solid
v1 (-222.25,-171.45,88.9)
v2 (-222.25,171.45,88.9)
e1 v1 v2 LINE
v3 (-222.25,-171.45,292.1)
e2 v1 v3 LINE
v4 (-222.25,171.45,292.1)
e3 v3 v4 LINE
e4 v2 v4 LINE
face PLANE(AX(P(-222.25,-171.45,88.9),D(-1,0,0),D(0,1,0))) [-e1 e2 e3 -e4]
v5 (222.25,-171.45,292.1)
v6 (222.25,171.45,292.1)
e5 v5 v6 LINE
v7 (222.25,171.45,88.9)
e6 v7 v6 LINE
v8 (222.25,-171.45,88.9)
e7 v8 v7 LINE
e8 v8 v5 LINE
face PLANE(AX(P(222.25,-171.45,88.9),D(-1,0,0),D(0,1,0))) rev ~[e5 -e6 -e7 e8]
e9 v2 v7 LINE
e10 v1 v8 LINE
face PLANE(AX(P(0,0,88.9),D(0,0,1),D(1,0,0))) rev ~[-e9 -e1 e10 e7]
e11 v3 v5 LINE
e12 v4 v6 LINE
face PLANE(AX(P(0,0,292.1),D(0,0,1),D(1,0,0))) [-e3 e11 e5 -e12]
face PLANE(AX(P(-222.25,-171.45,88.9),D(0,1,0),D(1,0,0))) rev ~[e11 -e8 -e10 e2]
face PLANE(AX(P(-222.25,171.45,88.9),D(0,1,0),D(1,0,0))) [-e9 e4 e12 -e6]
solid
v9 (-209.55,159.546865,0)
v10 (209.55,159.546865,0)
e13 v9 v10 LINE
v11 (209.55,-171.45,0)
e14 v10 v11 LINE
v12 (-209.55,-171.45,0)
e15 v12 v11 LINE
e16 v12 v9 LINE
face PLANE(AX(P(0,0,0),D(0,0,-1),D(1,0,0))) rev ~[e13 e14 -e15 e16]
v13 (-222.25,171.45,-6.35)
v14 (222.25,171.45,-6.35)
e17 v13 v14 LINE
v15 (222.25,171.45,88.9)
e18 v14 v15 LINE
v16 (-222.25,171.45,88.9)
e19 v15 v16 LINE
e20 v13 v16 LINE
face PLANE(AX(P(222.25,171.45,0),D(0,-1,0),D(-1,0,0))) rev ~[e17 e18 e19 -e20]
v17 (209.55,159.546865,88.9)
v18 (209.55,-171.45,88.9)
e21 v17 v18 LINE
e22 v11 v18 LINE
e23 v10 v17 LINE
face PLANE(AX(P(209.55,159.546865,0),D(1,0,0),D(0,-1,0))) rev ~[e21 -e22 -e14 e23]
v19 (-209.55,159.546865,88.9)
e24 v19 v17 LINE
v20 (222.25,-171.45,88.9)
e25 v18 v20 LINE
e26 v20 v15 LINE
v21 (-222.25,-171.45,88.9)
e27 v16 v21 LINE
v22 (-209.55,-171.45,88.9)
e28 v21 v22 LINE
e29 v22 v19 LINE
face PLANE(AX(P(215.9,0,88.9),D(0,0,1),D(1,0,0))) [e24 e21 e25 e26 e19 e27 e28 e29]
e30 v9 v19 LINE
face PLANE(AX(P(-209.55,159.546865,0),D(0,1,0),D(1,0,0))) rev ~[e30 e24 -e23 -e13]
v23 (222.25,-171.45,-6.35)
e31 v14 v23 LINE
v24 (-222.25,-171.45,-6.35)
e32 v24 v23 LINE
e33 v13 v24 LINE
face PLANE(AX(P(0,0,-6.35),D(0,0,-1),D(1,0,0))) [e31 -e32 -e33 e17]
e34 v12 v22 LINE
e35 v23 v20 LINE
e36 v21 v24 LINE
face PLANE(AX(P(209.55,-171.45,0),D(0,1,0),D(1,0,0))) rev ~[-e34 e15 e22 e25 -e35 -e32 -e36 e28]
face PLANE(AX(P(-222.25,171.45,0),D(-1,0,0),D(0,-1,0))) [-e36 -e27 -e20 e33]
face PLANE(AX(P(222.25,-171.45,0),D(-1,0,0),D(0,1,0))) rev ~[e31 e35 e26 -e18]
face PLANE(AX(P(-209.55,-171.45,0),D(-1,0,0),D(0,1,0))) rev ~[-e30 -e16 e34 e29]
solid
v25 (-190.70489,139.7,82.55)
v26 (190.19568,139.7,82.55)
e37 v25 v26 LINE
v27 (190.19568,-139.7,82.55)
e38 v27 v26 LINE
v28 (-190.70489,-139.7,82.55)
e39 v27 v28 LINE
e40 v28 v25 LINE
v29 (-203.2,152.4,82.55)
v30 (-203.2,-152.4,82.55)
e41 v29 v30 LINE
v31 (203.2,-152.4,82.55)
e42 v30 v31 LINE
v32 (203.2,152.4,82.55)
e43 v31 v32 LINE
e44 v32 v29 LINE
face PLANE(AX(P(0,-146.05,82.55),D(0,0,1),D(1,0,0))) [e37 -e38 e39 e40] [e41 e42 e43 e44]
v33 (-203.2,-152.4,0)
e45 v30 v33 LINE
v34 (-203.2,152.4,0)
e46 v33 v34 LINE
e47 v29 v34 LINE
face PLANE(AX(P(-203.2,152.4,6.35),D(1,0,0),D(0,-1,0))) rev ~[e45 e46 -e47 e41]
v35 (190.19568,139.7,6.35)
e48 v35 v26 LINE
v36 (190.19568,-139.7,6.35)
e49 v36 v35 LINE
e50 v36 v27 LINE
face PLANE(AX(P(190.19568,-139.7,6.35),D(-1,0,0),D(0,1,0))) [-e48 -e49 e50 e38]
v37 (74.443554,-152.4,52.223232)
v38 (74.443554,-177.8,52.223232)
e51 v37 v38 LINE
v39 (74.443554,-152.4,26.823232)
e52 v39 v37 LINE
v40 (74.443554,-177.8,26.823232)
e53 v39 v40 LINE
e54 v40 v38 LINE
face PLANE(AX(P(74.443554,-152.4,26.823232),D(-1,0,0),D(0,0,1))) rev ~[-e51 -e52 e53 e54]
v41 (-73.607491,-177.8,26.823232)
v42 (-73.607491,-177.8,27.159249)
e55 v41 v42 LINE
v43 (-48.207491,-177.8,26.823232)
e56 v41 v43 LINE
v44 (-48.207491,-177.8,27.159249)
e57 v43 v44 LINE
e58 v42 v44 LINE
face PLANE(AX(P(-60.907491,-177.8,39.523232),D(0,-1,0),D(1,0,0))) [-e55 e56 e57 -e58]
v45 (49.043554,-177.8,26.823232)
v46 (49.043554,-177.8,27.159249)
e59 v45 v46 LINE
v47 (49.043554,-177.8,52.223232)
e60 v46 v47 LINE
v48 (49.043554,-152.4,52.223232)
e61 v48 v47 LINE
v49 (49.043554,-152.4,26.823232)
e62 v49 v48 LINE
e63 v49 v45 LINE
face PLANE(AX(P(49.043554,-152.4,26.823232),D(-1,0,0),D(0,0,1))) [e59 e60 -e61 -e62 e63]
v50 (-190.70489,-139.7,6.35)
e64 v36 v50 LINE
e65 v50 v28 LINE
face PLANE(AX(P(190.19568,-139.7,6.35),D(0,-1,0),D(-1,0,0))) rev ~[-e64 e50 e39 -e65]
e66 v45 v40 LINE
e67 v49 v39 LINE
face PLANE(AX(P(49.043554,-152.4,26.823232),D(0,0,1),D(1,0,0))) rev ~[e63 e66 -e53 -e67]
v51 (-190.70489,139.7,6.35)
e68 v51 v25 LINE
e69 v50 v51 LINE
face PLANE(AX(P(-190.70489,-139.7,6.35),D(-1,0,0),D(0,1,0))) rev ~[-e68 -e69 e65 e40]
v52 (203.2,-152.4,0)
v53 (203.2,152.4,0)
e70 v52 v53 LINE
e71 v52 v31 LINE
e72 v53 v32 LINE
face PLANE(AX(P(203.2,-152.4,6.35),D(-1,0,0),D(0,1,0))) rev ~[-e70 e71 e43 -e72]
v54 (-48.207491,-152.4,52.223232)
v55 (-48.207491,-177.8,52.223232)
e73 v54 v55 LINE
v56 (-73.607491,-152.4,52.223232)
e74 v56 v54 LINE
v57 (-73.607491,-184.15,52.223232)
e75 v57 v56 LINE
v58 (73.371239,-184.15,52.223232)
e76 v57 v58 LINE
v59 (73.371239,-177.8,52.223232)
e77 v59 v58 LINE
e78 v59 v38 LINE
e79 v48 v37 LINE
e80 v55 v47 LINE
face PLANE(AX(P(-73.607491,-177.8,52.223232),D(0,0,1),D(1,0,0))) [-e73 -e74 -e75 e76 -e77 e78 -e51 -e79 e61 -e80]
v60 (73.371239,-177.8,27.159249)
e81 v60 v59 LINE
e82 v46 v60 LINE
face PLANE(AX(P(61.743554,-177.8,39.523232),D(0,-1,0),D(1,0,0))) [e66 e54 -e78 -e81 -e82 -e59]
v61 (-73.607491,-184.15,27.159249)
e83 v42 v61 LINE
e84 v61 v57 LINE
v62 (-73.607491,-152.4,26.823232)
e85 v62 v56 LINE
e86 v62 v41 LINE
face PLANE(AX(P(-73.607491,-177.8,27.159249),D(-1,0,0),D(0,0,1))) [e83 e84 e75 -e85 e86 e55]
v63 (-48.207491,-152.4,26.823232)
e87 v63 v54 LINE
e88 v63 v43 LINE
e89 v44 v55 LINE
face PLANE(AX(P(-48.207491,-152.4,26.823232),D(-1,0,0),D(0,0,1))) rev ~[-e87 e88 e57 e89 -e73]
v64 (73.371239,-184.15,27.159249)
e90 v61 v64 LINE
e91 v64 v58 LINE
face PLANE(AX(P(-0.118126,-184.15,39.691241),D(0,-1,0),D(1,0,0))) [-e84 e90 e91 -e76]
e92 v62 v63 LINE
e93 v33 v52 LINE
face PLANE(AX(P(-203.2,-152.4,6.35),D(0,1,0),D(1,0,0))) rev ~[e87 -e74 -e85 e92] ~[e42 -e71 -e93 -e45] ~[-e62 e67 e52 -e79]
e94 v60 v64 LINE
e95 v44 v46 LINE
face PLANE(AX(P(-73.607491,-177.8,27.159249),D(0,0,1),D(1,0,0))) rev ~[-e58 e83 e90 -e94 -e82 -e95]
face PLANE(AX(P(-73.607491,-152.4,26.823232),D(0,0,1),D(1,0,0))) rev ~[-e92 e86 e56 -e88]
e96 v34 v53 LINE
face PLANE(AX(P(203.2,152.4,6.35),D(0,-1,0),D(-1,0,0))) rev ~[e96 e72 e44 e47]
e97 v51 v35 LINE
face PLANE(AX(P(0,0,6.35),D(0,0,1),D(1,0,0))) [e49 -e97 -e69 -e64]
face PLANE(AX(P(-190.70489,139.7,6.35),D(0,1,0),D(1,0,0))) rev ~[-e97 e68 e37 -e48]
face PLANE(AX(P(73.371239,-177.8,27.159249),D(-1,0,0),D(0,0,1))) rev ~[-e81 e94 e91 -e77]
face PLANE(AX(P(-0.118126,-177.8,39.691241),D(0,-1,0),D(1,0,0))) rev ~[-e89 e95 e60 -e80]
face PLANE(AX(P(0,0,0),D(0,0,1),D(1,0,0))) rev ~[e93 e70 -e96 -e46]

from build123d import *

# Parameters (mm, degrees)
F0_W      = 406.4
F0_H      = 304.8
F1_DEPTH  = 6.35
F2_W      = 12.4951104045
F2_H      = 279.4
F2_W_2    = 13.0043203354
F3_DEPTH  = 76.2
F4_W      = 444.5
F4_H      = 342.9
F5_DEPTH  = 6.35
F6_W      = 419.1
F6_H      = 11.9031353712
F7_DEPTH  = 88.9
F8_W      = 444.5
F8_H      = 342.9
F9_DEPTH  = 203.2
F10_W     = 25.4
F10_H     = 25.4
F11_DEPTH = 25.4
F12_W     = 146.9787295926
F12_H     = 25.0639826562
F13_DEPTH = 6.35


# Not quite as in the source:
# - a length typed as a fraction of an inch, garbled in the dataset ("3 / 203.2 mm" for 3/8 in), is restored


with BuildPart() as f1:
    # F0 (on Top) → F1 (new body)
    with BuildSketch(Plane.XY):
        Rectangle(F0_W, F0_H)
    extrude(amount=F1_DEPTH)

    # F2 (on face) → F3 (join)
    with BuildSketch(Plane.XY.offset(6.35)):
        Polygon((-203.2, -139.7), (-203.2, -152.4), (203.2, -152.4), (203.2, -139.7), (190.1956796646, -139.7), (-190.7048895955, -139.7), align=None)
        with Locations((-196.9524447978, 0)):
            Rectangle(F2_W, F2_H)
        with Locations((196.6978398323, 0)):
            Rectangle(F2_W_2, F2_H)
        Polygon((-203.2, 152.4), (-203.2, 139.7), (-190.7048895955, 139.7), (190.1956796646, 139.7), (203.2, 139.7), (203.2, 152.4), align=None)
    extrude(amount=F3_DEPTH)

    # F10 (on face) → F11 (join)
    with BuildSketch(Plane.XZ.offset(152.4)):
        with Locations((-60.9074905861, 39.5232320662)):
            Rectangle(F10_W, F10_H)
        with Locations((61.7435536951, 39.5232320662)):
            Rectangle(F10_W, F10_H)
    extrude(amount=F11_DEPTH)

    # F12 (on face) → F13 (join)
    with BuildSketch(Plane.XZ.offset(177.8)):
        with Locations((-0.1181257898, 39.6912407381)):
            Rectangle(F12_W, F12_H)
    extrude(amount=F13_DEPTH)


with BuildPart() as f5:
    # F4 (on face) → F5 (new body)
    with BuildSketch(Plane(origin=(0, 0, 0), x_dir=(1, 0, 0), z_dir=(0, 0, -1))):
        Rectangle(F4_W, F4_H)
    extrude(amount=F5_DEPTH)

    # F6 (on face) → F7 (join)
    with BuildSketch(Plane.XY):
        Polygon((209.55, -171.45), (222.25, -171.45), (222.25, 171.45), (209.55, 171.45), (209.55, 159.5468646288), (209.55, -158.75), align=None)
        with Locations((0, 165.4984323144)):
            Rectangle(F6_W, F6_H)
        Polygon((-209.55, 159.5468646288), (-209.55, 171.45), (-222.25, 171.45), (-222.25, -171.45), (-209.55, -171.45), align=None)
    extrude(amount=F7_DEPTH)


with BuildPart() as f9:
    # F8 (on face) → F9 (new body)
    with BuildSketch(Plane.XY.offset(88.9)):
        Rectangle(F8_W, F8_H)
    extrude(amount=F9_DEPTH)


solid = Compound([f1.part, f5.part, f9.part])
